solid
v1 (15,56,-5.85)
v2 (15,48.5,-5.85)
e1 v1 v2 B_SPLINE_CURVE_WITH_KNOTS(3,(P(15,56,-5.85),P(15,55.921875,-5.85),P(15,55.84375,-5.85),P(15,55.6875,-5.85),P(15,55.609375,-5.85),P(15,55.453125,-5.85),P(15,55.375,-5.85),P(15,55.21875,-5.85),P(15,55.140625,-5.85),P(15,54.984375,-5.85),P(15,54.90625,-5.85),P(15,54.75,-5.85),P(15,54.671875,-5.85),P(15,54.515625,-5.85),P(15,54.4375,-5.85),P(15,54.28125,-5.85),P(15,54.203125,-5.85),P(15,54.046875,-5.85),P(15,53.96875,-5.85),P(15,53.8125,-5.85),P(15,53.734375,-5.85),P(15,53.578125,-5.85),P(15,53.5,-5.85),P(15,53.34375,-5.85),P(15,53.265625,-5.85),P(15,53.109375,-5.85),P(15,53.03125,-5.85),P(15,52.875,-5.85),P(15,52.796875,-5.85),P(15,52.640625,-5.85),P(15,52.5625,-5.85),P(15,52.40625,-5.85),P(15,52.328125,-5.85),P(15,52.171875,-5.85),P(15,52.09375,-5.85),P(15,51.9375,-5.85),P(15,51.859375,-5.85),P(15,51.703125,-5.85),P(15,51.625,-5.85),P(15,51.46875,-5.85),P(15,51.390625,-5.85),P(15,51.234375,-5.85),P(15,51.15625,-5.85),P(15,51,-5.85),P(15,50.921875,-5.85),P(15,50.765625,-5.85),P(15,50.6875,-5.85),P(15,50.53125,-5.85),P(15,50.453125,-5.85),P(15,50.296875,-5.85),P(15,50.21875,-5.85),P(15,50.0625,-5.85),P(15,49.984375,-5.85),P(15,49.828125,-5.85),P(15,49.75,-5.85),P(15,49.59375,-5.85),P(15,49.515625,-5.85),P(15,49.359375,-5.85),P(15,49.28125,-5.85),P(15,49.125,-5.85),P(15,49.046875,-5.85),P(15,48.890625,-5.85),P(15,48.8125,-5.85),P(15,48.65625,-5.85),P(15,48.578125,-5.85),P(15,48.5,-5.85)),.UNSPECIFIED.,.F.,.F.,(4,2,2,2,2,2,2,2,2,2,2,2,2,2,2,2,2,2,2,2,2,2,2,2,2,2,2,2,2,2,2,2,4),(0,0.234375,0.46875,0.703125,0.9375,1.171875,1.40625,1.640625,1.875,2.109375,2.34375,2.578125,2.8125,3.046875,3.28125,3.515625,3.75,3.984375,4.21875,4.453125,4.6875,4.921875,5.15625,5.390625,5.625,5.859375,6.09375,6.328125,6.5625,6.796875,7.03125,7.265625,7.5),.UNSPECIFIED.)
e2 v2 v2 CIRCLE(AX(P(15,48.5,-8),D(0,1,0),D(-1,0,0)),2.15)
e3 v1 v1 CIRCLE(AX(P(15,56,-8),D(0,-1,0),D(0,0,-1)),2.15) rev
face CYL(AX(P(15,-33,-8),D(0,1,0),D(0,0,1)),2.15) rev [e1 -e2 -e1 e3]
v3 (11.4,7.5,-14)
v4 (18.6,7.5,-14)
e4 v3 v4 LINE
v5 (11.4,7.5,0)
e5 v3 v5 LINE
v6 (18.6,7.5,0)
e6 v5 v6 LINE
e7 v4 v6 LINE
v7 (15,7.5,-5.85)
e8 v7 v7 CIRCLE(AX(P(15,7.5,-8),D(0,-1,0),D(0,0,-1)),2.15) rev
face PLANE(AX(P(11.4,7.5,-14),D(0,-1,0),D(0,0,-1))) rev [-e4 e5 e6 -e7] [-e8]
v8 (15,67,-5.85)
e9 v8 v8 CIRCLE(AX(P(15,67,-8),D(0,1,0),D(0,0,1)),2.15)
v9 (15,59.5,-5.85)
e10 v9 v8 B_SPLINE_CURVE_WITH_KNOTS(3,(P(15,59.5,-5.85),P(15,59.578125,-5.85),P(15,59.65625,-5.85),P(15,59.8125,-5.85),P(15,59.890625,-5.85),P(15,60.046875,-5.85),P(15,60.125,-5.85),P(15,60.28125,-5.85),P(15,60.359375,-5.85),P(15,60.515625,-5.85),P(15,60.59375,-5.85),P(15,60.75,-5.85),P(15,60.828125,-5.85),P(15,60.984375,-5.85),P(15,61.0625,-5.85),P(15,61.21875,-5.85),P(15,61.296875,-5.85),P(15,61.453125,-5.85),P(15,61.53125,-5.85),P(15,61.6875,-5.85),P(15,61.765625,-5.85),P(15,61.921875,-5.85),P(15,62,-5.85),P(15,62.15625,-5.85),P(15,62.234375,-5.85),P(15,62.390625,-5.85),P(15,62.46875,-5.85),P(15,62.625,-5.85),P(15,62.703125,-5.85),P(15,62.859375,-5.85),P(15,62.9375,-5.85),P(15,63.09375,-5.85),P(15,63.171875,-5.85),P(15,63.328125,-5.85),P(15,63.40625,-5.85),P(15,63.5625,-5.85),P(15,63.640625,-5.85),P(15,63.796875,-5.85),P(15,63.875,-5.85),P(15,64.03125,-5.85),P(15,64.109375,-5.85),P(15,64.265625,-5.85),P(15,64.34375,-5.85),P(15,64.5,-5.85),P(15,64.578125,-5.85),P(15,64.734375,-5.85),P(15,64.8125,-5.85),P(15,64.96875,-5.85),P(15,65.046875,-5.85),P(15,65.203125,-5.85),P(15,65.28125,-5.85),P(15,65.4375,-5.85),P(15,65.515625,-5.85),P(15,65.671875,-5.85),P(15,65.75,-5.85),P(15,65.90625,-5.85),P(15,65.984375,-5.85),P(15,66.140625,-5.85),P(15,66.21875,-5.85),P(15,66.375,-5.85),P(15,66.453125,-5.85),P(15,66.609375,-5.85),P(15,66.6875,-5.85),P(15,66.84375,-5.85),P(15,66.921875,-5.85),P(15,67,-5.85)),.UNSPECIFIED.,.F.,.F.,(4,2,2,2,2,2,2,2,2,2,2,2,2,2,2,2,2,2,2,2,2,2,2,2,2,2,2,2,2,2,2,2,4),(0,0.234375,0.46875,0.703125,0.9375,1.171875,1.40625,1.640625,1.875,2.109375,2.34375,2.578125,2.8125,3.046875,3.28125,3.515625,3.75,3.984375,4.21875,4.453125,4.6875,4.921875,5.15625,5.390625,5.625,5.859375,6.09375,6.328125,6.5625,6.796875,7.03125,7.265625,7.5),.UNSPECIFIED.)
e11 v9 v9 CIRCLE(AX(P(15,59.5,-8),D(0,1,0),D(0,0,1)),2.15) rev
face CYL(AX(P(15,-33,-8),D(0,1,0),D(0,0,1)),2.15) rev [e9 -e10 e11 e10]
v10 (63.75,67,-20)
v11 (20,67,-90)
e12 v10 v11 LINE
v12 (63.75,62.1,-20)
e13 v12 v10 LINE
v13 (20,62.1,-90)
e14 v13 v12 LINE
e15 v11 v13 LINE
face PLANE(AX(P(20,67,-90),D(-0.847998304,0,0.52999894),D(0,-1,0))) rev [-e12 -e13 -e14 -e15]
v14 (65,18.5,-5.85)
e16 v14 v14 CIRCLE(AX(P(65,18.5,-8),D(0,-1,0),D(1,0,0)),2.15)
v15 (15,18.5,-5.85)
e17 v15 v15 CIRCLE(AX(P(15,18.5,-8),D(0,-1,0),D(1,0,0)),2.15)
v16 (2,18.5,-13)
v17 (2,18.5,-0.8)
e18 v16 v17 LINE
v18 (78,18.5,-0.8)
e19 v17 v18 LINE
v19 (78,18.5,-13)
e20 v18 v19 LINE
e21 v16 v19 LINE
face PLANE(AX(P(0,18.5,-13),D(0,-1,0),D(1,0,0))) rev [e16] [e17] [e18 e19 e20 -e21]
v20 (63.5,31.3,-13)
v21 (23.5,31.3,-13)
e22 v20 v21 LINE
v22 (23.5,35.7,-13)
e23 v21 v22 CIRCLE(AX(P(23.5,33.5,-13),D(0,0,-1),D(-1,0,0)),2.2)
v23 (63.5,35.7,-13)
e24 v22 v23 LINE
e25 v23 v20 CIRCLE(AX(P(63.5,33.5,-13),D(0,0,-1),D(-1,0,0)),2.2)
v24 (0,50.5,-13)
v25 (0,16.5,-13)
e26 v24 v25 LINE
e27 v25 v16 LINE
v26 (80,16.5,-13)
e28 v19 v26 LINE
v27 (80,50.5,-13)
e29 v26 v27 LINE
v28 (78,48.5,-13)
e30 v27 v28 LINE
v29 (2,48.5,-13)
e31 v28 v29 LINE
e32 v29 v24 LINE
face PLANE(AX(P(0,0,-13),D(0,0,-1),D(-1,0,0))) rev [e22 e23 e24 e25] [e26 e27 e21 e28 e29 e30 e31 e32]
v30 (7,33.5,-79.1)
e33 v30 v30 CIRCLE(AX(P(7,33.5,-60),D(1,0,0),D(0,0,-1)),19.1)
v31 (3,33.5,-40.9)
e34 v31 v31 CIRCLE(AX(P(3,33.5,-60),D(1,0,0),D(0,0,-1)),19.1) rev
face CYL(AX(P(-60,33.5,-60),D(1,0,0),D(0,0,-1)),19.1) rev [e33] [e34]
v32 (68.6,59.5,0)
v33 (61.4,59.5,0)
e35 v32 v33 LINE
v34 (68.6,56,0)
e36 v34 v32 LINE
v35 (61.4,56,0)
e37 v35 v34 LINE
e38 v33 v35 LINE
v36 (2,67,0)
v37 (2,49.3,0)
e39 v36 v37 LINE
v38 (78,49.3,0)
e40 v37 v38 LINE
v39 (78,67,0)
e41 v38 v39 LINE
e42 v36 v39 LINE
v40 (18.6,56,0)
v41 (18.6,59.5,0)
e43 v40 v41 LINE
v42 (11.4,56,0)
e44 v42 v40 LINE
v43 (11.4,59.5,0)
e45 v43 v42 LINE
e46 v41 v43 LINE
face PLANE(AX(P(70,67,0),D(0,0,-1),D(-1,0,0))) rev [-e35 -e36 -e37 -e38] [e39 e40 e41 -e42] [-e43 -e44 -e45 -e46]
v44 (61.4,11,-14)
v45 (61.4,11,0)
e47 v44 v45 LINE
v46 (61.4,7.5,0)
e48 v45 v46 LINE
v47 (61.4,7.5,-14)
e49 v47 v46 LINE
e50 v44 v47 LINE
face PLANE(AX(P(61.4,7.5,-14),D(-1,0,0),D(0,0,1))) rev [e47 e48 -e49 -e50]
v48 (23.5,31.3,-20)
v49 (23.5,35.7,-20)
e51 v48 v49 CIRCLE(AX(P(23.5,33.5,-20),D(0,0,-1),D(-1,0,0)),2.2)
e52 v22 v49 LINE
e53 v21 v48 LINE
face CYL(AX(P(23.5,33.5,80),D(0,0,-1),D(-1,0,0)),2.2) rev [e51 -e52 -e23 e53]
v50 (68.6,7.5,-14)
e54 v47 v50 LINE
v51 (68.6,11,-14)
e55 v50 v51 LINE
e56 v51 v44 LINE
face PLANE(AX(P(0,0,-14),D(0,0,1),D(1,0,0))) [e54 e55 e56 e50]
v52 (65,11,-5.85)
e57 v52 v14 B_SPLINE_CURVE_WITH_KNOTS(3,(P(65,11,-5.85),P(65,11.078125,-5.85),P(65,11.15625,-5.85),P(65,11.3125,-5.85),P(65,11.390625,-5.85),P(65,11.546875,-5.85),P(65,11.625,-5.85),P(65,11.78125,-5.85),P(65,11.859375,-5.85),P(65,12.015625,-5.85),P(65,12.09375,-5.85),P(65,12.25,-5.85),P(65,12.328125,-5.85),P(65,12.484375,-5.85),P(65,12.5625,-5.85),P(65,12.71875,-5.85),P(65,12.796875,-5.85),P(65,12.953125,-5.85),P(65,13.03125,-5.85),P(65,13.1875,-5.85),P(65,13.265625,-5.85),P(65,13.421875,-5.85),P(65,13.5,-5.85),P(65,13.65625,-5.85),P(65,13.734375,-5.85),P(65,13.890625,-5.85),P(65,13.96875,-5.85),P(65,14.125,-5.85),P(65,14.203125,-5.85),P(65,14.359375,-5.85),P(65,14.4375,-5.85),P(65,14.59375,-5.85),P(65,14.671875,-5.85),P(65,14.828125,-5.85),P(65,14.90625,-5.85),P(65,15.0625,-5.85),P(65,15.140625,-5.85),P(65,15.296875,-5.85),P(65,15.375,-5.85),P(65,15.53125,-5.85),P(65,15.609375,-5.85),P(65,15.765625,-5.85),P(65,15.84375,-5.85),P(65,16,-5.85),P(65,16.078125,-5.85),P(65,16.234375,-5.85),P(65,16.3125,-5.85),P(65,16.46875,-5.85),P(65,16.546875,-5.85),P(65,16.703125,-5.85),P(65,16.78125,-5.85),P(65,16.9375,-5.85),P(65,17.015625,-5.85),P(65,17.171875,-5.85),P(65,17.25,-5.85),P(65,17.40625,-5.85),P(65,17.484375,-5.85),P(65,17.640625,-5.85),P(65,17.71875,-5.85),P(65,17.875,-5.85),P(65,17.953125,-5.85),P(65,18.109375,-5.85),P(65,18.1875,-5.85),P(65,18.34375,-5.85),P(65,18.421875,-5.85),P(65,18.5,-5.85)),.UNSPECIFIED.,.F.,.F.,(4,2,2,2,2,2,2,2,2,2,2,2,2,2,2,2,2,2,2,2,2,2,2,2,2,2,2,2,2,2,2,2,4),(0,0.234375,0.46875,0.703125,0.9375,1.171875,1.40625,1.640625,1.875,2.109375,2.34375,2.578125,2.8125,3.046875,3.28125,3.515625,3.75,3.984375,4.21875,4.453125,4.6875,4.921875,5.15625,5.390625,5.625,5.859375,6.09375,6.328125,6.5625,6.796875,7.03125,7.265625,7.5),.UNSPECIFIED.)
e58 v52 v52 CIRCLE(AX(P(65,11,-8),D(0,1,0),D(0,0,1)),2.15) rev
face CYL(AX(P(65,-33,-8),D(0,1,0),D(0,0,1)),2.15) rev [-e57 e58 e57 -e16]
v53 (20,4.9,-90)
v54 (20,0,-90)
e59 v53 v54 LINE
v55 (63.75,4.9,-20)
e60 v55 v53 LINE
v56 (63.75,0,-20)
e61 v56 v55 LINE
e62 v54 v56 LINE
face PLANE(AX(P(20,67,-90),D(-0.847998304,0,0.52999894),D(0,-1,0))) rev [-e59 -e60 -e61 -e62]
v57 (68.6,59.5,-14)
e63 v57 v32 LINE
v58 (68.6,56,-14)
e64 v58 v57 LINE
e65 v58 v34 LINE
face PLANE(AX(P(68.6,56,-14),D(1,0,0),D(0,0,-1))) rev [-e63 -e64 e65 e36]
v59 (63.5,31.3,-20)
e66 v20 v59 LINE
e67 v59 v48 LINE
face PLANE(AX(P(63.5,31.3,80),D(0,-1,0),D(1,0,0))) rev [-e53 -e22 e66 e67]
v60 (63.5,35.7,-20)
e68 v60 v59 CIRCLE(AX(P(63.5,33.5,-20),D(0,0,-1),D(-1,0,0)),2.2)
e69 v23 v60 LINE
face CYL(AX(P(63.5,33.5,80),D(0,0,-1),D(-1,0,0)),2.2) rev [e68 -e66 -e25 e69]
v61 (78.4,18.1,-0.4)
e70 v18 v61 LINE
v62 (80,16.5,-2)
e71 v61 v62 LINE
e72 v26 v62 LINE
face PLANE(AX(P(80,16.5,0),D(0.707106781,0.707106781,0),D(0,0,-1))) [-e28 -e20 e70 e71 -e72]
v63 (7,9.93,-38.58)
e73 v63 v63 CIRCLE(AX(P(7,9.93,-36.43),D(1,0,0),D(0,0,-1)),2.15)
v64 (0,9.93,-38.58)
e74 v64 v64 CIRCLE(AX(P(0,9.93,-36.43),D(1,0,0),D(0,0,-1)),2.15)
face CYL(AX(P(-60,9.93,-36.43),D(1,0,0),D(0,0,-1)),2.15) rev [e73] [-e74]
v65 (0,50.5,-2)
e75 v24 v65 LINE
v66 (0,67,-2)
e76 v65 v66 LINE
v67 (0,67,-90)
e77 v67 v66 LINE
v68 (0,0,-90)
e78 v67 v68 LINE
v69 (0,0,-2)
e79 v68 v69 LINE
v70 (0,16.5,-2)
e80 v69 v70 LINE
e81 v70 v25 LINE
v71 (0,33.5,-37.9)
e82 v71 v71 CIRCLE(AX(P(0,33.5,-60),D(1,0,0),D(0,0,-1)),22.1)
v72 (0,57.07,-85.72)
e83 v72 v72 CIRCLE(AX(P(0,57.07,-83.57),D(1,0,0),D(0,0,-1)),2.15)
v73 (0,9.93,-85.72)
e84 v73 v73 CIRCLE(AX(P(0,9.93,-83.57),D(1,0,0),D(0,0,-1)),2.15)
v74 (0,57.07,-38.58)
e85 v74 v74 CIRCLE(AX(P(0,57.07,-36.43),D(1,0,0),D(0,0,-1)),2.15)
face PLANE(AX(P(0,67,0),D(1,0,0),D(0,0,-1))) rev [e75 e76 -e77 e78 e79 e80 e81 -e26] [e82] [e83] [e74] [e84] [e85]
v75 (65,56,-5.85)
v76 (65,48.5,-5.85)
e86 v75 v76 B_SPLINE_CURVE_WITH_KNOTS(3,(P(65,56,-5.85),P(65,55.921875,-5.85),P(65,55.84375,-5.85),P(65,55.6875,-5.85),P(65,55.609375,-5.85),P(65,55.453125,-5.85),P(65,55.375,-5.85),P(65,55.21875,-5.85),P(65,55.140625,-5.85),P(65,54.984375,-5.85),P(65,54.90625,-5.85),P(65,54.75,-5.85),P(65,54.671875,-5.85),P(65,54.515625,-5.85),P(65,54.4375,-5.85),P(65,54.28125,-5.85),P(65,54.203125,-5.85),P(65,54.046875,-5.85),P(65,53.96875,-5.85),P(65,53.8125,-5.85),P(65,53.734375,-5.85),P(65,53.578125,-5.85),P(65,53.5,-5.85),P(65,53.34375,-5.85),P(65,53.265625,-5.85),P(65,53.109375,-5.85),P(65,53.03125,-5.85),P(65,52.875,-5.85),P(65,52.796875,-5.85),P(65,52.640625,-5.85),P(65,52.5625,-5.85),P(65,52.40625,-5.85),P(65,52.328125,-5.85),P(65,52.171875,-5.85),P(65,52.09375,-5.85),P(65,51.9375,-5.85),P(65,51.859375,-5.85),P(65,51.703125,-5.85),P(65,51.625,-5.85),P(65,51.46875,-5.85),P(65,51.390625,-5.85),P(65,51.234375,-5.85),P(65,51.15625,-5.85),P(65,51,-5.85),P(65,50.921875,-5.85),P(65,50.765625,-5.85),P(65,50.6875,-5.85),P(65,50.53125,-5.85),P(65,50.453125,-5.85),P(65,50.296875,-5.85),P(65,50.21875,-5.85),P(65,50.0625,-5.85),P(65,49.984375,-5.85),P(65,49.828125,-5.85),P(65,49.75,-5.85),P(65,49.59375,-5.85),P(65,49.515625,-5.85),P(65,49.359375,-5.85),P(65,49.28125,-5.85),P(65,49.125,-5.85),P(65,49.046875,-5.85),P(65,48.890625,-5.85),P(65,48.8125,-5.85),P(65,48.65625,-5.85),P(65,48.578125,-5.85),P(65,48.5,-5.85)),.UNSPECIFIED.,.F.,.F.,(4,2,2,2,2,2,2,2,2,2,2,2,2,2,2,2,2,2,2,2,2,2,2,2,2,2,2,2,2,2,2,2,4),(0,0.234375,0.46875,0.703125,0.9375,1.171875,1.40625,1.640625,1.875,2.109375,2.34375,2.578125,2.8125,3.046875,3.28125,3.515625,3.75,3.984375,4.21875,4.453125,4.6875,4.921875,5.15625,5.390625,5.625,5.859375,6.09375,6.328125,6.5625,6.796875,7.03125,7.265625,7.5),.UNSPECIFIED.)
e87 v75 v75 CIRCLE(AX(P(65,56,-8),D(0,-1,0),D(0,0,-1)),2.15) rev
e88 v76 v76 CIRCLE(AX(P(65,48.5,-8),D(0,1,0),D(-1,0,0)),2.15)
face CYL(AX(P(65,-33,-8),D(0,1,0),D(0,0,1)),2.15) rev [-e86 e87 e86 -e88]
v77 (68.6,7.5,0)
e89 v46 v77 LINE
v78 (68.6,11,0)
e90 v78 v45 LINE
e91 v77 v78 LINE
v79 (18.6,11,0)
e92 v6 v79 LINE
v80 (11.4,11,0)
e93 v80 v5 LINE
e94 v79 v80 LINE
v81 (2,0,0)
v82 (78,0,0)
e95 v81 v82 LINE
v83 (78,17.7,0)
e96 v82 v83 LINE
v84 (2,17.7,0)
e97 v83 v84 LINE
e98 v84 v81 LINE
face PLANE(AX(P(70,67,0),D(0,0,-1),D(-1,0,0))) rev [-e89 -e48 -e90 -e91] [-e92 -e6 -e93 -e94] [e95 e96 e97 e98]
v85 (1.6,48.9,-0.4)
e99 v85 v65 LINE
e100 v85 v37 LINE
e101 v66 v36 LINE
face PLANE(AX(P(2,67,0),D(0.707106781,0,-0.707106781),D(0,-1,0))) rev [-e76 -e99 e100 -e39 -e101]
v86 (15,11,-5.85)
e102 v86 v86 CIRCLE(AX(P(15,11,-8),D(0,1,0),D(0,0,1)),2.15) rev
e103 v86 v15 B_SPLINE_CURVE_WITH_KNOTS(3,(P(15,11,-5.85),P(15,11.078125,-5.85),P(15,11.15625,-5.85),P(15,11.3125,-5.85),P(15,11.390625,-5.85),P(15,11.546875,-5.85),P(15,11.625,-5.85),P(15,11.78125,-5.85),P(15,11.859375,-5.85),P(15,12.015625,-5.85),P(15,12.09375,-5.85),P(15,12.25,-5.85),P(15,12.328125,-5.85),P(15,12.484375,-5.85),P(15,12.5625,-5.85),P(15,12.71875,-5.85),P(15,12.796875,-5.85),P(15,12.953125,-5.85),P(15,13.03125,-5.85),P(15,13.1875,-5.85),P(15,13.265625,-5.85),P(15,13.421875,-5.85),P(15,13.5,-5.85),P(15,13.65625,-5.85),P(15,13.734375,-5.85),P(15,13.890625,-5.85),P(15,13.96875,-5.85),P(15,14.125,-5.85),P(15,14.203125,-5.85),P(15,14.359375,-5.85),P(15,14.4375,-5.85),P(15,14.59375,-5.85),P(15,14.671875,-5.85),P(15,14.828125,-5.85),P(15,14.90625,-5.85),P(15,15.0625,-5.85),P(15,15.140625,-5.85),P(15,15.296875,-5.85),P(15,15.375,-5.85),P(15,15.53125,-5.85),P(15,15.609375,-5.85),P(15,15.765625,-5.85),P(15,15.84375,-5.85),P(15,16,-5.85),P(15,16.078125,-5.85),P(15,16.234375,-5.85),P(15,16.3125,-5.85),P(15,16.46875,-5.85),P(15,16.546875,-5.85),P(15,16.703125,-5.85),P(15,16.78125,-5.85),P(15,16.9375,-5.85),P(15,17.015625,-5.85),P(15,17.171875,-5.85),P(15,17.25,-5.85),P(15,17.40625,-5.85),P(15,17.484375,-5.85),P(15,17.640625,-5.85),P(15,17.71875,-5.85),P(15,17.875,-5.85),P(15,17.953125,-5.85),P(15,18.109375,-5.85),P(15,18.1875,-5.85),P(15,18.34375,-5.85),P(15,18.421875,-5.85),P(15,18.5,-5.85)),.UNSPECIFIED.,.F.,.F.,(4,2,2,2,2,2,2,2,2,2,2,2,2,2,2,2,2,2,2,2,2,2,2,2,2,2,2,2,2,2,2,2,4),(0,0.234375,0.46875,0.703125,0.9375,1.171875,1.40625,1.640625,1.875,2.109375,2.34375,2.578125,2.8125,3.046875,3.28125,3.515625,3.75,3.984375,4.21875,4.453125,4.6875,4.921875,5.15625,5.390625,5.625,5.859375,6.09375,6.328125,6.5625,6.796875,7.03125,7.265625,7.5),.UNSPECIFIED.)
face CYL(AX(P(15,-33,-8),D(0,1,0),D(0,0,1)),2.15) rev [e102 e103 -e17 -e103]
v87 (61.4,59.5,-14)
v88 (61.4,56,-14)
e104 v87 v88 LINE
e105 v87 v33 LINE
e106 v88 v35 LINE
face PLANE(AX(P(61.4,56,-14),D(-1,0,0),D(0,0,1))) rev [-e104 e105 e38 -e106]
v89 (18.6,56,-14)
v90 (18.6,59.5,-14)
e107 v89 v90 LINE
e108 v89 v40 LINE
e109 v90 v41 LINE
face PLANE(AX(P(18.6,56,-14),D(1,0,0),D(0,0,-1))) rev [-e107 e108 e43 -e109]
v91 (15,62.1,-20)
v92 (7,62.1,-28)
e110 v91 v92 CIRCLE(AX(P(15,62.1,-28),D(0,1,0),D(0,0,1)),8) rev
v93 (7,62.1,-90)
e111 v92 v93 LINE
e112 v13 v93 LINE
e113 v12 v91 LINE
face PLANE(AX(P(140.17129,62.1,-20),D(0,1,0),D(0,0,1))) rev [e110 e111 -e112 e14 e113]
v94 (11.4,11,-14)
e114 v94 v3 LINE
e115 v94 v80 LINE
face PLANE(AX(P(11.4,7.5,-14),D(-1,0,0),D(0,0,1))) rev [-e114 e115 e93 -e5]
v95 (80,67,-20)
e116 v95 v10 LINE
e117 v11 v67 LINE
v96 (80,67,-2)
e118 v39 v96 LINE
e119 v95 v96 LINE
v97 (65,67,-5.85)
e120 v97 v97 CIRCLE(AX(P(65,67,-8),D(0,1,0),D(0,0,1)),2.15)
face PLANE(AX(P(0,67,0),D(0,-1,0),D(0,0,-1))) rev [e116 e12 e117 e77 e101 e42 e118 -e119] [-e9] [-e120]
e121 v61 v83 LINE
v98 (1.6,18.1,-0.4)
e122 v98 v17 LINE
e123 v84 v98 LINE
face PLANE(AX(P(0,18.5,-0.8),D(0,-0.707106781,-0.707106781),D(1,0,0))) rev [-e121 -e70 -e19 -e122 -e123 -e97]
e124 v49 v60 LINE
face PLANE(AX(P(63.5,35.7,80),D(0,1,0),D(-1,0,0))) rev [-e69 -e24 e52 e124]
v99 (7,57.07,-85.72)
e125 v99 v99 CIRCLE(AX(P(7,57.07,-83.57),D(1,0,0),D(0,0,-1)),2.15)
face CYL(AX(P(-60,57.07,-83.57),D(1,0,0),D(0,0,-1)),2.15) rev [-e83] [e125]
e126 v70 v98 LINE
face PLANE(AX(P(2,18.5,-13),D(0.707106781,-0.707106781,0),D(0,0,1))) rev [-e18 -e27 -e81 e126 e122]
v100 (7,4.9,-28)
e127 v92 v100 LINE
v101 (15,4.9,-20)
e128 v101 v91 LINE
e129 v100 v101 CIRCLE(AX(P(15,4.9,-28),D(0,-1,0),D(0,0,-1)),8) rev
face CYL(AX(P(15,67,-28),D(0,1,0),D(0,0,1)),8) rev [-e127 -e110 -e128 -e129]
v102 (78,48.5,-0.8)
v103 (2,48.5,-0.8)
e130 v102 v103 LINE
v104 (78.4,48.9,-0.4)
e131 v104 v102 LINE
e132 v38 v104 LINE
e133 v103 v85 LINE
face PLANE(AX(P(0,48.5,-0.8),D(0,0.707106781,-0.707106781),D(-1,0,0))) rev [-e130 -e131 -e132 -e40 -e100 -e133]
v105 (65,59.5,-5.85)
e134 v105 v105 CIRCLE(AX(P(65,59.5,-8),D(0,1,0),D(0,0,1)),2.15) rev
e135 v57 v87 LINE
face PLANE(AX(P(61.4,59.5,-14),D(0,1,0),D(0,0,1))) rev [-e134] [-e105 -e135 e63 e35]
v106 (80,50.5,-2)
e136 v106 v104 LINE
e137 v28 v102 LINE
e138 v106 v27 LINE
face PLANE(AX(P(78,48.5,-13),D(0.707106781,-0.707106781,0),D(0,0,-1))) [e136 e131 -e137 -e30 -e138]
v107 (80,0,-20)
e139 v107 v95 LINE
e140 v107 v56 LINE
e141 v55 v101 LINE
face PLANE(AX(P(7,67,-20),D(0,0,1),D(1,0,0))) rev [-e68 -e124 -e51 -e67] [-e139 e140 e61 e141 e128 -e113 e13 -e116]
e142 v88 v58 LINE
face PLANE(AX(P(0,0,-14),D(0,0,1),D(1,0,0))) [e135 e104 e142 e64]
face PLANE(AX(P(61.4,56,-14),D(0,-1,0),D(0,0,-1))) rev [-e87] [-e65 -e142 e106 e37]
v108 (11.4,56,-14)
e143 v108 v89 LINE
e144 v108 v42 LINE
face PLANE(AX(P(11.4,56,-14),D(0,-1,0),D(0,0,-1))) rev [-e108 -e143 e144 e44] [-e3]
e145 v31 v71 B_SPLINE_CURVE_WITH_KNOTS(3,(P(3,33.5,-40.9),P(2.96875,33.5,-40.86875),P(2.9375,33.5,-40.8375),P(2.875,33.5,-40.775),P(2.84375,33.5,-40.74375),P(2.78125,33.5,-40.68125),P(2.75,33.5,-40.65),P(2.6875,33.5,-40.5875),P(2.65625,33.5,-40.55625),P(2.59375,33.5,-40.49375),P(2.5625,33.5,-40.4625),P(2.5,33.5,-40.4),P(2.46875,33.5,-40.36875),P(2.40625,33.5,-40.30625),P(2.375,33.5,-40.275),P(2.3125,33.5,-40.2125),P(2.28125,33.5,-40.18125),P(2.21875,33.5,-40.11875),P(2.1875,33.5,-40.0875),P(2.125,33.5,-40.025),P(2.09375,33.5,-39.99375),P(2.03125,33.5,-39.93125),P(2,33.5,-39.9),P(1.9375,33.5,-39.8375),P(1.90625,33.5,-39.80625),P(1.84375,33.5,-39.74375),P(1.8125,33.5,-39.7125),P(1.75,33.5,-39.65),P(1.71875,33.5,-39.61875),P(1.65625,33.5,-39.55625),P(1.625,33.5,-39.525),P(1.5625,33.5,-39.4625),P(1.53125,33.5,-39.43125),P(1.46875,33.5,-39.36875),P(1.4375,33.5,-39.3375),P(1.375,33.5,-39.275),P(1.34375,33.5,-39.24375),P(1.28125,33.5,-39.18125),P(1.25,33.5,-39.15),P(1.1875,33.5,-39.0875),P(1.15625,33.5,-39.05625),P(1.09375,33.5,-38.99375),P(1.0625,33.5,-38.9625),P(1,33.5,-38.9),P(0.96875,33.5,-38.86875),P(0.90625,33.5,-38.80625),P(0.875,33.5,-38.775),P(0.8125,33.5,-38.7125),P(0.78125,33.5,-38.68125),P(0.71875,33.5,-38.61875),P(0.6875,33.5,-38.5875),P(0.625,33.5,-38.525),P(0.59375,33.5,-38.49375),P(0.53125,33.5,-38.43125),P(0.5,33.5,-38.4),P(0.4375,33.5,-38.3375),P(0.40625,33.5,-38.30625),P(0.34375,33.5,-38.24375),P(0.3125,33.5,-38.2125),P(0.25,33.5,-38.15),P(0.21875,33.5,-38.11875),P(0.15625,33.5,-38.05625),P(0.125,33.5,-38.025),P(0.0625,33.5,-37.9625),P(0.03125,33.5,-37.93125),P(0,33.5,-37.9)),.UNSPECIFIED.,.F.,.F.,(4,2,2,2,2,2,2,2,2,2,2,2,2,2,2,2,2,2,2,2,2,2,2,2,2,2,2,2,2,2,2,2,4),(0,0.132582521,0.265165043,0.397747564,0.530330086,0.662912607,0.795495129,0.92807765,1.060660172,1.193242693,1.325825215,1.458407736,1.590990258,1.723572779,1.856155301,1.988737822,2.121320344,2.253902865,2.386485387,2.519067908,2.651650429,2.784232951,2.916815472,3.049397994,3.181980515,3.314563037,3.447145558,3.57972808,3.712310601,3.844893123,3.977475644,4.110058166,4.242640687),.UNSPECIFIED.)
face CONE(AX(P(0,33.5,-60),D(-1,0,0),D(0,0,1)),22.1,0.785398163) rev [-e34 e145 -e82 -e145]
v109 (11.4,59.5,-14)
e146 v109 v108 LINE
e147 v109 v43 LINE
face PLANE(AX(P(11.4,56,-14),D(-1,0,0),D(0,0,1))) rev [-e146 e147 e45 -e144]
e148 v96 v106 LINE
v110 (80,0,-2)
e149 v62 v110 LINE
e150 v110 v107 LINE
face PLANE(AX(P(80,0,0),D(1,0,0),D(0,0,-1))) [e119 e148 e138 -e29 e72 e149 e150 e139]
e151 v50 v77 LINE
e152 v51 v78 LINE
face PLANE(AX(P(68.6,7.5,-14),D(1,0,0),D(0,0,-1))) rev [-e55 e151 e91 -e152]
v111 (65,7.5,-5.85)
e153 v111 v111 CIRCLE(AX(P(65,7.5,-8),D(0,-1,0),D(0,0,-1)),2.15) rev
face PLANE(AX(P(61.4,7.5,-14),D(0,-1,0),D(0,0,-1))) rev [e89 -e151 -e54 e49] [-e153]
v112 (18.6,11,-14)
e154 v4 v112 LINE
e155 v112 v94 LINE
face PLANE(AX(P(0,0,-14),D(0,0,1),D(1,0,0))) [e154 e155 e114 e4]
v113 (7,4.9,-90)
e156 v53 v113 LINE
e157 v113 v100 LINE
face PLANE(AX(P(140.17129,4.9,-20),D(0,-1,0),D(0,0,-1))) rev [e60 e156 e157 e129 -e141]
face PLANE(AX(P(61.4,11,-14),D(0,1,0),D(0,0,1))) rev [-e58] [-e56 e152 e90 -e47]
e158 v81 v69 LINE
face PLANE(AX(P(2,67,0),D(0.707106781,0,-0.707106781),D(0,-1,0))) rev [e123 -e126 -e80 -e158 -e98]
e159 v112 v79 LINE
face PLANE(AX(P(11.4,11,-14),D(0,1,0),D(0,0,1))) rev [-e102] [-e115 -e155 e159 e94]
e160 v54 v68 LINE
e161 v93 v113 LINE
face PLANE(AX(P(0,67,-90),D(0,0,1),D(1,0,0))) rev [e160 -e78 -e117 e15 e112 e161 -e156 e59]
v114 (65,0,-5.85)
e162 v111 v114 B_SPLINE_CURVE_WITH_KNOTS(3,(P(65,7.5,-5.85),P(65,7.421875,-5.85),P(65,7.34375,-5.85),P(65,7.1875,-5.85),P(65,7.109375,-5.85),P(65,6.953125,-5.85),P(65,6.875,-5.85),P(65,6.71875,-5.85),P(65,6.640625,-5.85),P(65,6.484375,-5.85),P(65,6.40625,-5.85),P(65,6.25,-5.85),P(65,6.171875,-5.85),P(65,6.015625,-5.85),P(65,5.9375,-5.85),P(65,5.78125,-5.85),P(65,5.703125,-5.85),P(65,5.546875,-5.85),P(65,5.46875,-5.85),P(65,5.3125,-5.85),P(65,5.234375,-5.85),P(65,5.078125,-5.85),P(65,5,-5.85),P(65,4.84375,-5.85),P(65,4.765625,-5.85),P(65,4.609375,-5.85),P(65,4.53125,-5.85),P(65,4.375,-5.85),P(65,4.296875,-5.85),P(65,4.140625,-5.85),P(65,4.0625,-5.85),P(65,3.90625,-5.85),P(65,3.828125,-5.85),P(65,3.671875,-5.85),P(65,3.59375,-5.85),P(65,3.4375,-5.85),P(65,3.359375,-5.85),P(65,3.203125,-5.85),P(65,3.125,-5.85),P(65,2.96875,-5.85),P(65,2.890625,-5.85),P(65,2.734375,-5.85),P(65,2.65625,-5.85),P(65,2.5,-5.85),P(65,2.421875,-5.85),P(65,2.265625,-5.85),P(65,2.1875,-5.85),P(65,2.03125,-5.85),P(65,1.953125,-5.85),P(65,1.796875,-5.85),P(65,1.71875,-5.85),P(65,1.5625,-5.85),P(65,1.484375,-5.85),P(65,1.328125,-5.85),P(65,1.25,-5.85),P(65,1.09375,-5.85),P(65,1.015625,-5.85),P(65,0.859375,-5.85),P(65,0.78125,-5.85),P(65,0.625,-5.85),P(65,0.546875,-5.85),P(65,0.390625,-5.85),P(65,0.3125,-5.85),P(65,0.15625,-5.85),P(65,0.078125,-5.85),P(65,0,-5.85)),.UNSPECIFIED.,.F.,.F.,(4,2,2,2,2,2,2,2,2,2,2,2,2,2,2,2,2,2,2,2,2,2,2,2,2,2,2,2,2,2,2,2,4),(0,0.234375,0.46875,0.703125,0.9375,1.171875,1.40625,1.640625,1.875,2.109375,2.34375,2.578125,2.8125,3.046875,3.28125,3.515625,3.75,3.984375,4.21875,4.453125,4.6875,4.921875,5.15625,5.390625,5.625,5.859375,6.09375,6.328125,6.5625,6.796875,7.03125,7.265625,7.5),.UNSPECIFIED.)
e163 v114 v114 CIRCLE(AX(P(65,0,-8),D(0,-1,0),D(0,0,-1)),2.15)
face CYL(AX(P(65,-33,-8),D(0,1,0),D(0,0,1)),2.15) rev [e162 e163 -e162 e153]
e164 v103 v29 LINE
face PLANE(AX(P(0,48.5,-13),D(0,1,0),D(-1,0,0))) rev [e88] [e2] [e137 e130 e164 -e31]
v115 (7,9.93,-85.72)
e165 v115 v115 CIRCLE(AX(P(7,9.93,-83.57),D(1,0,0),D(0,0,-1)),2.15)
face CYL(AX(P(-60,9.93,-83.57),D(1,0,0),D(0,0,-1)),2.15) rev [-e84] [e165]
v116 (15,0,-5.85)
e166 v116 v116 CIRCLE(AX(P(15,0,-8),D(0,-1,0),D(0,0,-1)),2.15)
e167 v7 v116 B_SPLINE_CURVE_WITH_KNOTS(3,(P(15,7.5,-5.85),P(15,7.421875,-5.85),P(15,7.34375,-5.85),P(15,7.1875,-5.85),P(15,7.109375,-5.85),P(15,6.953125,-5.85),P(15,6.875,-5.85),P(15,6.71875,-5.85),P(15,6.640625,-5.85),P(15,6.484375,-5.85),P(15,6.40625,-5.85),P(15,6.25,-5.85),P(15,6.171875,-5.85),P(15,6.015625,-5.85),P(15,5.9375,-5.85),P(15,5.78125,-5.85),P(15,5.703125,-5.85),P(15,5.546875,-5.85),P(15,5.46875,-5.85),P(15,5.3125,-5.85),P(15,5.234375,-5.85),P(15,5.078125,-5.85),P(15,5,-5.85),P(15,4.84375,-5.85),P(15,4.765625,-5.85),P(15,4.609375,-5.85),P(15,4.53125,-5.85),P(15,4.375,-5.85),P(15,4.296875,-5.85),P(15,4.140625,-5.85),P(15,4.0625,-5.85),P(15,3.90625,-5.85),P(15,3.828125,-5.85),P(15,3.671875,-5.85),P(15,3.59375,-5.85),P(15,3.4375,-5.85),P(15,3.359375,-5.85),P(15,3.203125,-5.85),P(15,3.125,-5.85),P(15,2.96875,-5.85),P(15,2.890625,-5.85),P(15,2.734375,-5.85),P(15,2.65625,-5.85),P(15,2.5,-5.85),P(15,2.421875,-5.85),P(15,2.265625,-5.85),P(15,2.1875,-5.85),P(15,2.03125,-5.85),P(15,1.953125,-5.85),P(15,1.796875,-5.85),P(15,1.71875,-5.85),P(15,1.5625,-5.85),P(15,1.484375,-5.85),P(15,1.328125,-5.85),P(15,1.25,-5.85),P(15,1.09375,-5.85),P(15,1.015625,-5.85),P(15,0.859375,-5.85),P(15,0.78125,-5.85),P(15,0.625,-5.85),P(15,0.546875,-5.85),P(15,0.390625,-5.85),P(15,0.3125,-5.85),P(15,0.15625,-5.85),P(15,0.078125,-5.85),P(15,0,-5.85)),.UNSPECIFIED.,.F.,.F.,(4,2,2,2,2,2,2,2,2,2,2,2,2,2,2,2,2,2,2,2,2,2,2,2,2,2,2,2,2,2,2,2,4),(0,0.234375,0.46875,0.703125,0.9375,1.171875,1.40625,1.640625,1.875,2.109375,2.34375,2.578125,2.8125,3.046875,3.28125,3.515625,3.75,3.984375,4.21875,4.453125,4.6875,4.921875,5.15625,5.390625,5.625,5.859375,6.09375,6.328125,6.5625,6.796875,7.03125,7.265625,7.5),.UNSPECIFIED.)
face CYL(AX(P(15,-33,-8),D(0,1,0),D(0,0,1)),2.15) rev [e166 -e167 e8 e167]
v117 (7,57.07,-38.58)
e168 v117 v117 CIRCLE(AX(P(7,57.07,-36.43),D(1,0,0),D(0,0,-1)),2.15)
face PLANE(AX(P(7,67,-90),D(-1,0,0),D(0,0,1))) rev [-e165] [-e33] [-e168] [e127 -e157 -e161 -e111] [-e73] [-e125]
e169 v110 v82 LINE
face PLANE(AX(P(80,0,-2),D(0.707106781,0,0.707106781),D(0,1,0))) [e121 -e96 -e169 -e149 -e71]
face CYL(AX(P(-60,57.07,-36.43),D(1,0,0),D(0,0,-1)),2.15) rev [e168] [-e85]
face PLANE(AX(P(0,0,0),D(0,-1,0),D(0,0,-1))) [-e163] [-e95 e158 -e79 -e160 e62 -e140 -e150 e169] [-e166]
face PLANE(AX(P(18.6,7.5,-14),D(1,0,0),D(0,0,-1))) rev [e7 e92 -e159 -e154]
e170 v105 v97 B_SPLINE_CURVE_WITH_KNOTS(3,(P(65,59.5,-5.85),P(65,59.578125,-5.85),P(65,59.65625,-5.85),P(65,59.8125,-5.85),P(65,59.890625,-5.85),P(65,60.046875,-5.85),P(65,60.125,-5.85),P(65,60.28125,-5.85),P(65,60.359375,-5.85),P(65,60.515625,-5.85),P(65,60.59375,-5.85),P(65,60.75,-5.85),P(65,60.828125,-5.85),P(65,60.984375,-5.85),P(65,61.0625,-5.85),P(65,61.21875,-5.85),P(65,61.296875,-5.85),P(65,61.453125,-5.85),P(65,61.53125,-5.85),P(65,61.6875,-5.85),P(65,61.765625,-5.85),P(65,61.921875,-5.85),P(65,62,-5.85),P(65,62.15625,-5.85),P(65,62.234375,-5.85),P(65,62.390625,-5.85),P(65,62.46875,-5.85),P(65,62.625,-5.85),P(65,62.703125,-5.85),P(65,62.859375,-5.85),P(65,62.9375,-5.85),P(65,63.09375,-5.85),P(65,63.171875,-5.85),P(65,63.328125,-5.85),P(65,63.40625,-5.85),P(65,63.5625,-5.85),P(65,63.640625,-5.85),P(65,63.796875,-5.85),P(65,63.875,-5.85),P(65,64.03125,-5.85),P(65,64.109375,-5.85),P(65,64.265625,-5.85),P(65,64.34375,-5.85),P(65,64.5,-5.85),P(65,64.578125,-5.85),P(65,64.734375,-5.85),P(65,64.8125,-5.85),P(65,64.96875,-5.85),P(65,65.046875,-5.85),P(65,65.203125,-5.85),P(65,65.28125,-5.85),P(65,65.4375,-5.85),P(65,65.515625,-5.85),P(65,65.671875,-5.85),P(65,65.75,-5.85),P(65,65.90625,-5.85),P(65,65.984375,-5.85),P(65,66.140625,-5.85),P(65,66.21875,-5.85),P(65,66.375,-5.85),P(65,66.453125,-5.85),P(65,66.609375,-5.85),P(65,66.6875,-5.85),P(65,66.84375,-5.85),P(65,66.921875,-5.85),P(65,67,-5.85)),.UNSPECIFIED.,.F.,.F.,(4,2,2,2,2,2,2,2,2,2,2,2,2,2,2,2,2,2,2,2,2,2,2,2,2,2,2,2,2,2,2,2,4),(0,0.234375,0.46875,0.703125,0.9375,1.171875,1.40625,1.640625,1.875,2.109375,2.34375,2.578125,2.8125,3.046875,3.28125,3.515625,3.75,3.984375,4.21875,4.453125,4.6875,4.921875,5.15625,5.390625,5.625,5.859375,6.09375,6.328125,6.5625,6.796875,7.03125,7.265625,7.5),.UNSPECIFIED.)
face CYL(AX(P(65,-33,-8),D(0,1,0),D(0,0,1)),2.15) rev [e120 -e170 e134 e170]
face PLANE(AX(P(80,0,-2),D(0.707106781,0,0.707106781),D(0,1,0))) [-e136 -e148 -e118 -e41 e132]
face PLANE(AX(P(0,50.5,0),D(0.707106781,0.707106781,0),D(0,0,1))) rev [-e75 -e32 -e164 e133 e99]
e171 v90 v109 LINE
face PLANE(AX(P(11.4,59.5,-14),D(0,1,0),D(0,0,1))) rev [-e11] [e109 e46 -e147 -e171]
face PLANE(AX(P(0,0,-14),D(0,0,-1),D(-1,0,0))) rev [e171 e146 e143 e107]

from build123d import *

# Parameters (mm, degrees)
BOSS_EXTRUDE1_DEPTH = 67
SKETCH2_R           = 2.15
SKETCH2_R_2         = 19.1
CUT_EXTRUDE1_DEPTH  = 67
SKETCH3_W           = 70
SKETCH3_H           = 4.9
BOSS_EXTRUDE2_DEPTH = 63
SKETCH4_W           = 20
SKETCH4_H           = 67
BOSS_EXTRUDE3_DEPTH = 10
CHAMFER1_SIZE       = 80
CHAMFER1_SIZE_2     = 50
SKETCH6_W           = 80
SKETCH6_H           = 30
CUT_EXTRUDE2_DEPTH  = 13
SKETCH7_R           = 2.15
CUT_EXTRUDE3_DEPTH  = 100
CUT_EXTRUDE4_DEPTH  = 100
FILLET2_R           = 8
SKETCH9_W           = 7.2
SKETCH9_H           = 3.5
CUT_EXTRUDE5_DEPTH  = 14
CHAMFER2_SIZE       = 2
CHAMFER3_SIZE       = 2
CHAMFER4_SIZE       = 0.8
CHAMFER5_SIZE       = 3


with BuildPart() as part:
    # Sketch1 → Boss-Extrude1 (new body)
    with BuildSketch(Plane(origin=(0, 0, 0), x_dir=(1, 0, 0), z_dir=(0, 1, 0))):
        Polygon((0, 0), (0, 90), (7, 90), (7, 20), (70, 20), (70, 0), align=None)
    extrude(amount=BOSS_EXTRUDE1_DEPTH)

    # Sketch2 → Cut-Extrude1 (cut)
    with BuildSketch(Plane(origin=(7, 0, 0), x_dir=(0, 0, -1), z_dir=(1, 0, 0))):
        with Locations((83.57, 57.07)):
            Circle(SKETCH2_R)
        with Locations((36.43, 57.07)):
            Circle(SKETCH2_R)
        with Locations((36.43, 9.93)):
            Circle(SKETCH2_R)
        with Locations((83.57, 9.93)):
            Circle(SKETCH2_R)
        with Locations((60, 33.5)):
            Circle(SKETCH2_R_2)
    extrude(amount=-CUT_EXTRUDE1_DEPTH, mode=Mode.SUBTRACT)

    # Sketch3 → Boss-Extrude2 (add)
    with BuildSketch(Plane(origin=(7, 0, 0), x_dir=(0, 0, -1), z_dir=(1, 0, 0))):
        with Locations((55, 64.55)):
            Rectangle(SKETCH3_W, SKETCH3_H)
        with Locations((55, 2.45)):
            Rectangle(SKETCH3_W, SKETCH3_H)
    extrude(amount=BOSS_EXTRUDE2_DEPTH)

    # Sketch4 → Boss-Extrude3 (add)
    with BuildSketch(Plane(origin=(70, 0, 0), x_dir=(0, 0, -1), z_dir=(1, 0, 0))):
        with Locations((10, 33.5)):
            Rectangle(SKETCH4_W, SKETCH4_H)
    extrude(amount=BOSS_EXTRUDE3_DEPTH)

    # Chamfer1
    # the kernel refuses this chamfer: 80, 50 mm, written as the material it takes off along each edge
    with BuildSketch(Plane(origin=(70, -206.827451207, -90), x_dir=(0.020500139102813345, 0, 0.9997898500668855), z_dir=(0, 1, 0))) as chamfer1_piece_1_section:
        Polygon((CHAMFER1_SIZE * 0.999789850067, -CHAMFER1_SIZE * 0.0205001391028), (-CHAMFER1_SIZE_2 * 0.0205001391028, -CHAMFER1_SIZE_2 * 0.999789850067), (0, 0), align=None)
    chamfer1_piece_1 = extrude(amount=418.554902414, mode=Mode.PRIVATE)
    chamfer1_piece_1 = split(chamfer1_piece_1, bisect_by=Plane(origin=(53.400446445, 2.45, -20), z_dir=(0, 0, -1)), keep=Keep.TOP, mode=Mode.PRIVATE)
    add(chamfer1_piece_1, mode=Mode.SUBTRACT)
    with BuildSketch(Plane(origin=(70, 273.827451207, -90), x_dir=(0.020500139102813345, 0, 0.9997898500668855), z_dir=(0, -1, 0))) as chamfer1_piece_2_section:
        Polygon((CHAMFER1_SIZE * 0.999789850067, CHAMFER1_SIZE * 0.0205001391028), (-CHAMFER1_SIZE_2 * 0.0205001391028, CHAMFER1_SIZE_2 * 0.999789850067), (0, 0), align=None)
    chamfer1_piece_2 = extrude(amount=418.554902414, mode=Mode.PRIVATE)
    chamfer1_piece_2 = split(chamfer1_piece_2, bisect_by=Plane(origin=(53.400446445, 64.55, -20), z_dir=(0, 0, -1)), keep=Keep.TOP, mode=Mode.PRIVATE)
    add(chamfer1_piece_2, mode=Mode.SUBTRACT)

    # Sketch6 → Cut-Extrude2 (cut)
    with BuildSketch(Plane.XY):
        with Locations((40, 33.5)):
            Rectangle(SKETCH6_W, SKETCH6_H)
    extrude(amount=-CUT_EXTRUDE2_DEPTH, mode=Mode.SUBTRACT)

    # Sketch7 → Cut-Extrude3 (cut)
    with BuildSketch(Plane(origin=(0, 67, 0), x_dir=(1, 0, 0), z_dir=(0, 1, 0))):
        with Locations(Location((15, 8, 0), (0, 0, 270))):
            Circle(SKETCH7_R)
        with Locations(Location((65, 8, 0), (0, 0, 270))):
            Circle(SKETCH7_R)
    extrude(amount=-CUT_EXTRUDE3_DEPTH, mode=Mode.SUBTRACT)

    # Sketch8 → Cut-Extrude4 (cut)
    with BuildSketch(Plane(origin=(0, 0, -20), x_dir=(-1, 0, 0), z_dir=(0, 0, -1))):
        with BuildLine():
            Line((-63.5, 35.7), (-23.5, 35.7))
            ThreePointArc((-23.5, 35.7), (-21.3, 33.5), (-23.5, 31.3))
            Line((-23.5, 31.3), (-63.5, 31.3))
            ThreePointArc((-63.5, 31.3), (-65.7, 33.5), (-63.5, 35.7))
        make_face()
    extrude(amount=-CUT_EXTRUDE4_DEPTH, mode=Mode.SUBTRACT)

    # Fillet2
    fillet2_edges = [part.edges().sort_by_distance(p)[0] for p in [
        (7, 33.5, -20),
    ]]
    fillet(fillet2_edges, radius=FILLET2_R)

    # Sketch9 → Cut-Extrude5 (cut)
    with BuildSketch(Plane.XY):
        with Locations((65, 57.75)):
            Rectangle(SKETCH9_W, SKETCH9_H)
        with Locations((15, 57.75)):
            Rectangle(SKETCH9_W, SKETCH9_H)
        with Locations((65, 9.25)):
            Rectangle(SKETCH9_W, SKETCH9_H)
        with Locations((15, 9.25)):
            Rectangle(SKETCH9_W, SKETCH9_H)
    extrude(amount=-CUT_EXTRUDE5_DEPTH, mode=Mode.SUBTRACT)

    # Chamfer2
    chamfer2_edges = [part.edges().sort_by_distance(p)[0] for p in [
        (80, 48.5, -6.5),
        (80, 18.5, -6.5),
        (0, 18.5, -6.5),
        (0, 48.5, -6.5),
    ]]
    chamfer(chamfer2_edges, length=CHAMFER2_SIZE)

    # Chamfer3
    chamfer3_edges = [part.edges().sort_by_distance(p)[0] for p in [
        (80, 58.75, 0),
        (80, 8.25, 0),
        (0, 58.75, 0),
        (0, 8.25, 0),
    ]]
    chamfer(chamfer3_edges, length=CHAMFER3_SIZE)

    # Chamfer4
    chamfer4_edges = [part.edges().sort_by_distance(p)[0] for p in [
        (40, 18.5, 0),
        (40, 48.5, 0),
    ]]
    chamfer(chamfer4_edges, length=CHAMFER4_SIZE)

    # Chamfer5
    chamfer5_edges = [part.edges().sort_by_distance(p)[0] for p in [
        (0, 33.5, -40.9),
    ]]
    chamfer(chamfer5_edges, length=CHAMFER5_SIZE)


solid = part.part
